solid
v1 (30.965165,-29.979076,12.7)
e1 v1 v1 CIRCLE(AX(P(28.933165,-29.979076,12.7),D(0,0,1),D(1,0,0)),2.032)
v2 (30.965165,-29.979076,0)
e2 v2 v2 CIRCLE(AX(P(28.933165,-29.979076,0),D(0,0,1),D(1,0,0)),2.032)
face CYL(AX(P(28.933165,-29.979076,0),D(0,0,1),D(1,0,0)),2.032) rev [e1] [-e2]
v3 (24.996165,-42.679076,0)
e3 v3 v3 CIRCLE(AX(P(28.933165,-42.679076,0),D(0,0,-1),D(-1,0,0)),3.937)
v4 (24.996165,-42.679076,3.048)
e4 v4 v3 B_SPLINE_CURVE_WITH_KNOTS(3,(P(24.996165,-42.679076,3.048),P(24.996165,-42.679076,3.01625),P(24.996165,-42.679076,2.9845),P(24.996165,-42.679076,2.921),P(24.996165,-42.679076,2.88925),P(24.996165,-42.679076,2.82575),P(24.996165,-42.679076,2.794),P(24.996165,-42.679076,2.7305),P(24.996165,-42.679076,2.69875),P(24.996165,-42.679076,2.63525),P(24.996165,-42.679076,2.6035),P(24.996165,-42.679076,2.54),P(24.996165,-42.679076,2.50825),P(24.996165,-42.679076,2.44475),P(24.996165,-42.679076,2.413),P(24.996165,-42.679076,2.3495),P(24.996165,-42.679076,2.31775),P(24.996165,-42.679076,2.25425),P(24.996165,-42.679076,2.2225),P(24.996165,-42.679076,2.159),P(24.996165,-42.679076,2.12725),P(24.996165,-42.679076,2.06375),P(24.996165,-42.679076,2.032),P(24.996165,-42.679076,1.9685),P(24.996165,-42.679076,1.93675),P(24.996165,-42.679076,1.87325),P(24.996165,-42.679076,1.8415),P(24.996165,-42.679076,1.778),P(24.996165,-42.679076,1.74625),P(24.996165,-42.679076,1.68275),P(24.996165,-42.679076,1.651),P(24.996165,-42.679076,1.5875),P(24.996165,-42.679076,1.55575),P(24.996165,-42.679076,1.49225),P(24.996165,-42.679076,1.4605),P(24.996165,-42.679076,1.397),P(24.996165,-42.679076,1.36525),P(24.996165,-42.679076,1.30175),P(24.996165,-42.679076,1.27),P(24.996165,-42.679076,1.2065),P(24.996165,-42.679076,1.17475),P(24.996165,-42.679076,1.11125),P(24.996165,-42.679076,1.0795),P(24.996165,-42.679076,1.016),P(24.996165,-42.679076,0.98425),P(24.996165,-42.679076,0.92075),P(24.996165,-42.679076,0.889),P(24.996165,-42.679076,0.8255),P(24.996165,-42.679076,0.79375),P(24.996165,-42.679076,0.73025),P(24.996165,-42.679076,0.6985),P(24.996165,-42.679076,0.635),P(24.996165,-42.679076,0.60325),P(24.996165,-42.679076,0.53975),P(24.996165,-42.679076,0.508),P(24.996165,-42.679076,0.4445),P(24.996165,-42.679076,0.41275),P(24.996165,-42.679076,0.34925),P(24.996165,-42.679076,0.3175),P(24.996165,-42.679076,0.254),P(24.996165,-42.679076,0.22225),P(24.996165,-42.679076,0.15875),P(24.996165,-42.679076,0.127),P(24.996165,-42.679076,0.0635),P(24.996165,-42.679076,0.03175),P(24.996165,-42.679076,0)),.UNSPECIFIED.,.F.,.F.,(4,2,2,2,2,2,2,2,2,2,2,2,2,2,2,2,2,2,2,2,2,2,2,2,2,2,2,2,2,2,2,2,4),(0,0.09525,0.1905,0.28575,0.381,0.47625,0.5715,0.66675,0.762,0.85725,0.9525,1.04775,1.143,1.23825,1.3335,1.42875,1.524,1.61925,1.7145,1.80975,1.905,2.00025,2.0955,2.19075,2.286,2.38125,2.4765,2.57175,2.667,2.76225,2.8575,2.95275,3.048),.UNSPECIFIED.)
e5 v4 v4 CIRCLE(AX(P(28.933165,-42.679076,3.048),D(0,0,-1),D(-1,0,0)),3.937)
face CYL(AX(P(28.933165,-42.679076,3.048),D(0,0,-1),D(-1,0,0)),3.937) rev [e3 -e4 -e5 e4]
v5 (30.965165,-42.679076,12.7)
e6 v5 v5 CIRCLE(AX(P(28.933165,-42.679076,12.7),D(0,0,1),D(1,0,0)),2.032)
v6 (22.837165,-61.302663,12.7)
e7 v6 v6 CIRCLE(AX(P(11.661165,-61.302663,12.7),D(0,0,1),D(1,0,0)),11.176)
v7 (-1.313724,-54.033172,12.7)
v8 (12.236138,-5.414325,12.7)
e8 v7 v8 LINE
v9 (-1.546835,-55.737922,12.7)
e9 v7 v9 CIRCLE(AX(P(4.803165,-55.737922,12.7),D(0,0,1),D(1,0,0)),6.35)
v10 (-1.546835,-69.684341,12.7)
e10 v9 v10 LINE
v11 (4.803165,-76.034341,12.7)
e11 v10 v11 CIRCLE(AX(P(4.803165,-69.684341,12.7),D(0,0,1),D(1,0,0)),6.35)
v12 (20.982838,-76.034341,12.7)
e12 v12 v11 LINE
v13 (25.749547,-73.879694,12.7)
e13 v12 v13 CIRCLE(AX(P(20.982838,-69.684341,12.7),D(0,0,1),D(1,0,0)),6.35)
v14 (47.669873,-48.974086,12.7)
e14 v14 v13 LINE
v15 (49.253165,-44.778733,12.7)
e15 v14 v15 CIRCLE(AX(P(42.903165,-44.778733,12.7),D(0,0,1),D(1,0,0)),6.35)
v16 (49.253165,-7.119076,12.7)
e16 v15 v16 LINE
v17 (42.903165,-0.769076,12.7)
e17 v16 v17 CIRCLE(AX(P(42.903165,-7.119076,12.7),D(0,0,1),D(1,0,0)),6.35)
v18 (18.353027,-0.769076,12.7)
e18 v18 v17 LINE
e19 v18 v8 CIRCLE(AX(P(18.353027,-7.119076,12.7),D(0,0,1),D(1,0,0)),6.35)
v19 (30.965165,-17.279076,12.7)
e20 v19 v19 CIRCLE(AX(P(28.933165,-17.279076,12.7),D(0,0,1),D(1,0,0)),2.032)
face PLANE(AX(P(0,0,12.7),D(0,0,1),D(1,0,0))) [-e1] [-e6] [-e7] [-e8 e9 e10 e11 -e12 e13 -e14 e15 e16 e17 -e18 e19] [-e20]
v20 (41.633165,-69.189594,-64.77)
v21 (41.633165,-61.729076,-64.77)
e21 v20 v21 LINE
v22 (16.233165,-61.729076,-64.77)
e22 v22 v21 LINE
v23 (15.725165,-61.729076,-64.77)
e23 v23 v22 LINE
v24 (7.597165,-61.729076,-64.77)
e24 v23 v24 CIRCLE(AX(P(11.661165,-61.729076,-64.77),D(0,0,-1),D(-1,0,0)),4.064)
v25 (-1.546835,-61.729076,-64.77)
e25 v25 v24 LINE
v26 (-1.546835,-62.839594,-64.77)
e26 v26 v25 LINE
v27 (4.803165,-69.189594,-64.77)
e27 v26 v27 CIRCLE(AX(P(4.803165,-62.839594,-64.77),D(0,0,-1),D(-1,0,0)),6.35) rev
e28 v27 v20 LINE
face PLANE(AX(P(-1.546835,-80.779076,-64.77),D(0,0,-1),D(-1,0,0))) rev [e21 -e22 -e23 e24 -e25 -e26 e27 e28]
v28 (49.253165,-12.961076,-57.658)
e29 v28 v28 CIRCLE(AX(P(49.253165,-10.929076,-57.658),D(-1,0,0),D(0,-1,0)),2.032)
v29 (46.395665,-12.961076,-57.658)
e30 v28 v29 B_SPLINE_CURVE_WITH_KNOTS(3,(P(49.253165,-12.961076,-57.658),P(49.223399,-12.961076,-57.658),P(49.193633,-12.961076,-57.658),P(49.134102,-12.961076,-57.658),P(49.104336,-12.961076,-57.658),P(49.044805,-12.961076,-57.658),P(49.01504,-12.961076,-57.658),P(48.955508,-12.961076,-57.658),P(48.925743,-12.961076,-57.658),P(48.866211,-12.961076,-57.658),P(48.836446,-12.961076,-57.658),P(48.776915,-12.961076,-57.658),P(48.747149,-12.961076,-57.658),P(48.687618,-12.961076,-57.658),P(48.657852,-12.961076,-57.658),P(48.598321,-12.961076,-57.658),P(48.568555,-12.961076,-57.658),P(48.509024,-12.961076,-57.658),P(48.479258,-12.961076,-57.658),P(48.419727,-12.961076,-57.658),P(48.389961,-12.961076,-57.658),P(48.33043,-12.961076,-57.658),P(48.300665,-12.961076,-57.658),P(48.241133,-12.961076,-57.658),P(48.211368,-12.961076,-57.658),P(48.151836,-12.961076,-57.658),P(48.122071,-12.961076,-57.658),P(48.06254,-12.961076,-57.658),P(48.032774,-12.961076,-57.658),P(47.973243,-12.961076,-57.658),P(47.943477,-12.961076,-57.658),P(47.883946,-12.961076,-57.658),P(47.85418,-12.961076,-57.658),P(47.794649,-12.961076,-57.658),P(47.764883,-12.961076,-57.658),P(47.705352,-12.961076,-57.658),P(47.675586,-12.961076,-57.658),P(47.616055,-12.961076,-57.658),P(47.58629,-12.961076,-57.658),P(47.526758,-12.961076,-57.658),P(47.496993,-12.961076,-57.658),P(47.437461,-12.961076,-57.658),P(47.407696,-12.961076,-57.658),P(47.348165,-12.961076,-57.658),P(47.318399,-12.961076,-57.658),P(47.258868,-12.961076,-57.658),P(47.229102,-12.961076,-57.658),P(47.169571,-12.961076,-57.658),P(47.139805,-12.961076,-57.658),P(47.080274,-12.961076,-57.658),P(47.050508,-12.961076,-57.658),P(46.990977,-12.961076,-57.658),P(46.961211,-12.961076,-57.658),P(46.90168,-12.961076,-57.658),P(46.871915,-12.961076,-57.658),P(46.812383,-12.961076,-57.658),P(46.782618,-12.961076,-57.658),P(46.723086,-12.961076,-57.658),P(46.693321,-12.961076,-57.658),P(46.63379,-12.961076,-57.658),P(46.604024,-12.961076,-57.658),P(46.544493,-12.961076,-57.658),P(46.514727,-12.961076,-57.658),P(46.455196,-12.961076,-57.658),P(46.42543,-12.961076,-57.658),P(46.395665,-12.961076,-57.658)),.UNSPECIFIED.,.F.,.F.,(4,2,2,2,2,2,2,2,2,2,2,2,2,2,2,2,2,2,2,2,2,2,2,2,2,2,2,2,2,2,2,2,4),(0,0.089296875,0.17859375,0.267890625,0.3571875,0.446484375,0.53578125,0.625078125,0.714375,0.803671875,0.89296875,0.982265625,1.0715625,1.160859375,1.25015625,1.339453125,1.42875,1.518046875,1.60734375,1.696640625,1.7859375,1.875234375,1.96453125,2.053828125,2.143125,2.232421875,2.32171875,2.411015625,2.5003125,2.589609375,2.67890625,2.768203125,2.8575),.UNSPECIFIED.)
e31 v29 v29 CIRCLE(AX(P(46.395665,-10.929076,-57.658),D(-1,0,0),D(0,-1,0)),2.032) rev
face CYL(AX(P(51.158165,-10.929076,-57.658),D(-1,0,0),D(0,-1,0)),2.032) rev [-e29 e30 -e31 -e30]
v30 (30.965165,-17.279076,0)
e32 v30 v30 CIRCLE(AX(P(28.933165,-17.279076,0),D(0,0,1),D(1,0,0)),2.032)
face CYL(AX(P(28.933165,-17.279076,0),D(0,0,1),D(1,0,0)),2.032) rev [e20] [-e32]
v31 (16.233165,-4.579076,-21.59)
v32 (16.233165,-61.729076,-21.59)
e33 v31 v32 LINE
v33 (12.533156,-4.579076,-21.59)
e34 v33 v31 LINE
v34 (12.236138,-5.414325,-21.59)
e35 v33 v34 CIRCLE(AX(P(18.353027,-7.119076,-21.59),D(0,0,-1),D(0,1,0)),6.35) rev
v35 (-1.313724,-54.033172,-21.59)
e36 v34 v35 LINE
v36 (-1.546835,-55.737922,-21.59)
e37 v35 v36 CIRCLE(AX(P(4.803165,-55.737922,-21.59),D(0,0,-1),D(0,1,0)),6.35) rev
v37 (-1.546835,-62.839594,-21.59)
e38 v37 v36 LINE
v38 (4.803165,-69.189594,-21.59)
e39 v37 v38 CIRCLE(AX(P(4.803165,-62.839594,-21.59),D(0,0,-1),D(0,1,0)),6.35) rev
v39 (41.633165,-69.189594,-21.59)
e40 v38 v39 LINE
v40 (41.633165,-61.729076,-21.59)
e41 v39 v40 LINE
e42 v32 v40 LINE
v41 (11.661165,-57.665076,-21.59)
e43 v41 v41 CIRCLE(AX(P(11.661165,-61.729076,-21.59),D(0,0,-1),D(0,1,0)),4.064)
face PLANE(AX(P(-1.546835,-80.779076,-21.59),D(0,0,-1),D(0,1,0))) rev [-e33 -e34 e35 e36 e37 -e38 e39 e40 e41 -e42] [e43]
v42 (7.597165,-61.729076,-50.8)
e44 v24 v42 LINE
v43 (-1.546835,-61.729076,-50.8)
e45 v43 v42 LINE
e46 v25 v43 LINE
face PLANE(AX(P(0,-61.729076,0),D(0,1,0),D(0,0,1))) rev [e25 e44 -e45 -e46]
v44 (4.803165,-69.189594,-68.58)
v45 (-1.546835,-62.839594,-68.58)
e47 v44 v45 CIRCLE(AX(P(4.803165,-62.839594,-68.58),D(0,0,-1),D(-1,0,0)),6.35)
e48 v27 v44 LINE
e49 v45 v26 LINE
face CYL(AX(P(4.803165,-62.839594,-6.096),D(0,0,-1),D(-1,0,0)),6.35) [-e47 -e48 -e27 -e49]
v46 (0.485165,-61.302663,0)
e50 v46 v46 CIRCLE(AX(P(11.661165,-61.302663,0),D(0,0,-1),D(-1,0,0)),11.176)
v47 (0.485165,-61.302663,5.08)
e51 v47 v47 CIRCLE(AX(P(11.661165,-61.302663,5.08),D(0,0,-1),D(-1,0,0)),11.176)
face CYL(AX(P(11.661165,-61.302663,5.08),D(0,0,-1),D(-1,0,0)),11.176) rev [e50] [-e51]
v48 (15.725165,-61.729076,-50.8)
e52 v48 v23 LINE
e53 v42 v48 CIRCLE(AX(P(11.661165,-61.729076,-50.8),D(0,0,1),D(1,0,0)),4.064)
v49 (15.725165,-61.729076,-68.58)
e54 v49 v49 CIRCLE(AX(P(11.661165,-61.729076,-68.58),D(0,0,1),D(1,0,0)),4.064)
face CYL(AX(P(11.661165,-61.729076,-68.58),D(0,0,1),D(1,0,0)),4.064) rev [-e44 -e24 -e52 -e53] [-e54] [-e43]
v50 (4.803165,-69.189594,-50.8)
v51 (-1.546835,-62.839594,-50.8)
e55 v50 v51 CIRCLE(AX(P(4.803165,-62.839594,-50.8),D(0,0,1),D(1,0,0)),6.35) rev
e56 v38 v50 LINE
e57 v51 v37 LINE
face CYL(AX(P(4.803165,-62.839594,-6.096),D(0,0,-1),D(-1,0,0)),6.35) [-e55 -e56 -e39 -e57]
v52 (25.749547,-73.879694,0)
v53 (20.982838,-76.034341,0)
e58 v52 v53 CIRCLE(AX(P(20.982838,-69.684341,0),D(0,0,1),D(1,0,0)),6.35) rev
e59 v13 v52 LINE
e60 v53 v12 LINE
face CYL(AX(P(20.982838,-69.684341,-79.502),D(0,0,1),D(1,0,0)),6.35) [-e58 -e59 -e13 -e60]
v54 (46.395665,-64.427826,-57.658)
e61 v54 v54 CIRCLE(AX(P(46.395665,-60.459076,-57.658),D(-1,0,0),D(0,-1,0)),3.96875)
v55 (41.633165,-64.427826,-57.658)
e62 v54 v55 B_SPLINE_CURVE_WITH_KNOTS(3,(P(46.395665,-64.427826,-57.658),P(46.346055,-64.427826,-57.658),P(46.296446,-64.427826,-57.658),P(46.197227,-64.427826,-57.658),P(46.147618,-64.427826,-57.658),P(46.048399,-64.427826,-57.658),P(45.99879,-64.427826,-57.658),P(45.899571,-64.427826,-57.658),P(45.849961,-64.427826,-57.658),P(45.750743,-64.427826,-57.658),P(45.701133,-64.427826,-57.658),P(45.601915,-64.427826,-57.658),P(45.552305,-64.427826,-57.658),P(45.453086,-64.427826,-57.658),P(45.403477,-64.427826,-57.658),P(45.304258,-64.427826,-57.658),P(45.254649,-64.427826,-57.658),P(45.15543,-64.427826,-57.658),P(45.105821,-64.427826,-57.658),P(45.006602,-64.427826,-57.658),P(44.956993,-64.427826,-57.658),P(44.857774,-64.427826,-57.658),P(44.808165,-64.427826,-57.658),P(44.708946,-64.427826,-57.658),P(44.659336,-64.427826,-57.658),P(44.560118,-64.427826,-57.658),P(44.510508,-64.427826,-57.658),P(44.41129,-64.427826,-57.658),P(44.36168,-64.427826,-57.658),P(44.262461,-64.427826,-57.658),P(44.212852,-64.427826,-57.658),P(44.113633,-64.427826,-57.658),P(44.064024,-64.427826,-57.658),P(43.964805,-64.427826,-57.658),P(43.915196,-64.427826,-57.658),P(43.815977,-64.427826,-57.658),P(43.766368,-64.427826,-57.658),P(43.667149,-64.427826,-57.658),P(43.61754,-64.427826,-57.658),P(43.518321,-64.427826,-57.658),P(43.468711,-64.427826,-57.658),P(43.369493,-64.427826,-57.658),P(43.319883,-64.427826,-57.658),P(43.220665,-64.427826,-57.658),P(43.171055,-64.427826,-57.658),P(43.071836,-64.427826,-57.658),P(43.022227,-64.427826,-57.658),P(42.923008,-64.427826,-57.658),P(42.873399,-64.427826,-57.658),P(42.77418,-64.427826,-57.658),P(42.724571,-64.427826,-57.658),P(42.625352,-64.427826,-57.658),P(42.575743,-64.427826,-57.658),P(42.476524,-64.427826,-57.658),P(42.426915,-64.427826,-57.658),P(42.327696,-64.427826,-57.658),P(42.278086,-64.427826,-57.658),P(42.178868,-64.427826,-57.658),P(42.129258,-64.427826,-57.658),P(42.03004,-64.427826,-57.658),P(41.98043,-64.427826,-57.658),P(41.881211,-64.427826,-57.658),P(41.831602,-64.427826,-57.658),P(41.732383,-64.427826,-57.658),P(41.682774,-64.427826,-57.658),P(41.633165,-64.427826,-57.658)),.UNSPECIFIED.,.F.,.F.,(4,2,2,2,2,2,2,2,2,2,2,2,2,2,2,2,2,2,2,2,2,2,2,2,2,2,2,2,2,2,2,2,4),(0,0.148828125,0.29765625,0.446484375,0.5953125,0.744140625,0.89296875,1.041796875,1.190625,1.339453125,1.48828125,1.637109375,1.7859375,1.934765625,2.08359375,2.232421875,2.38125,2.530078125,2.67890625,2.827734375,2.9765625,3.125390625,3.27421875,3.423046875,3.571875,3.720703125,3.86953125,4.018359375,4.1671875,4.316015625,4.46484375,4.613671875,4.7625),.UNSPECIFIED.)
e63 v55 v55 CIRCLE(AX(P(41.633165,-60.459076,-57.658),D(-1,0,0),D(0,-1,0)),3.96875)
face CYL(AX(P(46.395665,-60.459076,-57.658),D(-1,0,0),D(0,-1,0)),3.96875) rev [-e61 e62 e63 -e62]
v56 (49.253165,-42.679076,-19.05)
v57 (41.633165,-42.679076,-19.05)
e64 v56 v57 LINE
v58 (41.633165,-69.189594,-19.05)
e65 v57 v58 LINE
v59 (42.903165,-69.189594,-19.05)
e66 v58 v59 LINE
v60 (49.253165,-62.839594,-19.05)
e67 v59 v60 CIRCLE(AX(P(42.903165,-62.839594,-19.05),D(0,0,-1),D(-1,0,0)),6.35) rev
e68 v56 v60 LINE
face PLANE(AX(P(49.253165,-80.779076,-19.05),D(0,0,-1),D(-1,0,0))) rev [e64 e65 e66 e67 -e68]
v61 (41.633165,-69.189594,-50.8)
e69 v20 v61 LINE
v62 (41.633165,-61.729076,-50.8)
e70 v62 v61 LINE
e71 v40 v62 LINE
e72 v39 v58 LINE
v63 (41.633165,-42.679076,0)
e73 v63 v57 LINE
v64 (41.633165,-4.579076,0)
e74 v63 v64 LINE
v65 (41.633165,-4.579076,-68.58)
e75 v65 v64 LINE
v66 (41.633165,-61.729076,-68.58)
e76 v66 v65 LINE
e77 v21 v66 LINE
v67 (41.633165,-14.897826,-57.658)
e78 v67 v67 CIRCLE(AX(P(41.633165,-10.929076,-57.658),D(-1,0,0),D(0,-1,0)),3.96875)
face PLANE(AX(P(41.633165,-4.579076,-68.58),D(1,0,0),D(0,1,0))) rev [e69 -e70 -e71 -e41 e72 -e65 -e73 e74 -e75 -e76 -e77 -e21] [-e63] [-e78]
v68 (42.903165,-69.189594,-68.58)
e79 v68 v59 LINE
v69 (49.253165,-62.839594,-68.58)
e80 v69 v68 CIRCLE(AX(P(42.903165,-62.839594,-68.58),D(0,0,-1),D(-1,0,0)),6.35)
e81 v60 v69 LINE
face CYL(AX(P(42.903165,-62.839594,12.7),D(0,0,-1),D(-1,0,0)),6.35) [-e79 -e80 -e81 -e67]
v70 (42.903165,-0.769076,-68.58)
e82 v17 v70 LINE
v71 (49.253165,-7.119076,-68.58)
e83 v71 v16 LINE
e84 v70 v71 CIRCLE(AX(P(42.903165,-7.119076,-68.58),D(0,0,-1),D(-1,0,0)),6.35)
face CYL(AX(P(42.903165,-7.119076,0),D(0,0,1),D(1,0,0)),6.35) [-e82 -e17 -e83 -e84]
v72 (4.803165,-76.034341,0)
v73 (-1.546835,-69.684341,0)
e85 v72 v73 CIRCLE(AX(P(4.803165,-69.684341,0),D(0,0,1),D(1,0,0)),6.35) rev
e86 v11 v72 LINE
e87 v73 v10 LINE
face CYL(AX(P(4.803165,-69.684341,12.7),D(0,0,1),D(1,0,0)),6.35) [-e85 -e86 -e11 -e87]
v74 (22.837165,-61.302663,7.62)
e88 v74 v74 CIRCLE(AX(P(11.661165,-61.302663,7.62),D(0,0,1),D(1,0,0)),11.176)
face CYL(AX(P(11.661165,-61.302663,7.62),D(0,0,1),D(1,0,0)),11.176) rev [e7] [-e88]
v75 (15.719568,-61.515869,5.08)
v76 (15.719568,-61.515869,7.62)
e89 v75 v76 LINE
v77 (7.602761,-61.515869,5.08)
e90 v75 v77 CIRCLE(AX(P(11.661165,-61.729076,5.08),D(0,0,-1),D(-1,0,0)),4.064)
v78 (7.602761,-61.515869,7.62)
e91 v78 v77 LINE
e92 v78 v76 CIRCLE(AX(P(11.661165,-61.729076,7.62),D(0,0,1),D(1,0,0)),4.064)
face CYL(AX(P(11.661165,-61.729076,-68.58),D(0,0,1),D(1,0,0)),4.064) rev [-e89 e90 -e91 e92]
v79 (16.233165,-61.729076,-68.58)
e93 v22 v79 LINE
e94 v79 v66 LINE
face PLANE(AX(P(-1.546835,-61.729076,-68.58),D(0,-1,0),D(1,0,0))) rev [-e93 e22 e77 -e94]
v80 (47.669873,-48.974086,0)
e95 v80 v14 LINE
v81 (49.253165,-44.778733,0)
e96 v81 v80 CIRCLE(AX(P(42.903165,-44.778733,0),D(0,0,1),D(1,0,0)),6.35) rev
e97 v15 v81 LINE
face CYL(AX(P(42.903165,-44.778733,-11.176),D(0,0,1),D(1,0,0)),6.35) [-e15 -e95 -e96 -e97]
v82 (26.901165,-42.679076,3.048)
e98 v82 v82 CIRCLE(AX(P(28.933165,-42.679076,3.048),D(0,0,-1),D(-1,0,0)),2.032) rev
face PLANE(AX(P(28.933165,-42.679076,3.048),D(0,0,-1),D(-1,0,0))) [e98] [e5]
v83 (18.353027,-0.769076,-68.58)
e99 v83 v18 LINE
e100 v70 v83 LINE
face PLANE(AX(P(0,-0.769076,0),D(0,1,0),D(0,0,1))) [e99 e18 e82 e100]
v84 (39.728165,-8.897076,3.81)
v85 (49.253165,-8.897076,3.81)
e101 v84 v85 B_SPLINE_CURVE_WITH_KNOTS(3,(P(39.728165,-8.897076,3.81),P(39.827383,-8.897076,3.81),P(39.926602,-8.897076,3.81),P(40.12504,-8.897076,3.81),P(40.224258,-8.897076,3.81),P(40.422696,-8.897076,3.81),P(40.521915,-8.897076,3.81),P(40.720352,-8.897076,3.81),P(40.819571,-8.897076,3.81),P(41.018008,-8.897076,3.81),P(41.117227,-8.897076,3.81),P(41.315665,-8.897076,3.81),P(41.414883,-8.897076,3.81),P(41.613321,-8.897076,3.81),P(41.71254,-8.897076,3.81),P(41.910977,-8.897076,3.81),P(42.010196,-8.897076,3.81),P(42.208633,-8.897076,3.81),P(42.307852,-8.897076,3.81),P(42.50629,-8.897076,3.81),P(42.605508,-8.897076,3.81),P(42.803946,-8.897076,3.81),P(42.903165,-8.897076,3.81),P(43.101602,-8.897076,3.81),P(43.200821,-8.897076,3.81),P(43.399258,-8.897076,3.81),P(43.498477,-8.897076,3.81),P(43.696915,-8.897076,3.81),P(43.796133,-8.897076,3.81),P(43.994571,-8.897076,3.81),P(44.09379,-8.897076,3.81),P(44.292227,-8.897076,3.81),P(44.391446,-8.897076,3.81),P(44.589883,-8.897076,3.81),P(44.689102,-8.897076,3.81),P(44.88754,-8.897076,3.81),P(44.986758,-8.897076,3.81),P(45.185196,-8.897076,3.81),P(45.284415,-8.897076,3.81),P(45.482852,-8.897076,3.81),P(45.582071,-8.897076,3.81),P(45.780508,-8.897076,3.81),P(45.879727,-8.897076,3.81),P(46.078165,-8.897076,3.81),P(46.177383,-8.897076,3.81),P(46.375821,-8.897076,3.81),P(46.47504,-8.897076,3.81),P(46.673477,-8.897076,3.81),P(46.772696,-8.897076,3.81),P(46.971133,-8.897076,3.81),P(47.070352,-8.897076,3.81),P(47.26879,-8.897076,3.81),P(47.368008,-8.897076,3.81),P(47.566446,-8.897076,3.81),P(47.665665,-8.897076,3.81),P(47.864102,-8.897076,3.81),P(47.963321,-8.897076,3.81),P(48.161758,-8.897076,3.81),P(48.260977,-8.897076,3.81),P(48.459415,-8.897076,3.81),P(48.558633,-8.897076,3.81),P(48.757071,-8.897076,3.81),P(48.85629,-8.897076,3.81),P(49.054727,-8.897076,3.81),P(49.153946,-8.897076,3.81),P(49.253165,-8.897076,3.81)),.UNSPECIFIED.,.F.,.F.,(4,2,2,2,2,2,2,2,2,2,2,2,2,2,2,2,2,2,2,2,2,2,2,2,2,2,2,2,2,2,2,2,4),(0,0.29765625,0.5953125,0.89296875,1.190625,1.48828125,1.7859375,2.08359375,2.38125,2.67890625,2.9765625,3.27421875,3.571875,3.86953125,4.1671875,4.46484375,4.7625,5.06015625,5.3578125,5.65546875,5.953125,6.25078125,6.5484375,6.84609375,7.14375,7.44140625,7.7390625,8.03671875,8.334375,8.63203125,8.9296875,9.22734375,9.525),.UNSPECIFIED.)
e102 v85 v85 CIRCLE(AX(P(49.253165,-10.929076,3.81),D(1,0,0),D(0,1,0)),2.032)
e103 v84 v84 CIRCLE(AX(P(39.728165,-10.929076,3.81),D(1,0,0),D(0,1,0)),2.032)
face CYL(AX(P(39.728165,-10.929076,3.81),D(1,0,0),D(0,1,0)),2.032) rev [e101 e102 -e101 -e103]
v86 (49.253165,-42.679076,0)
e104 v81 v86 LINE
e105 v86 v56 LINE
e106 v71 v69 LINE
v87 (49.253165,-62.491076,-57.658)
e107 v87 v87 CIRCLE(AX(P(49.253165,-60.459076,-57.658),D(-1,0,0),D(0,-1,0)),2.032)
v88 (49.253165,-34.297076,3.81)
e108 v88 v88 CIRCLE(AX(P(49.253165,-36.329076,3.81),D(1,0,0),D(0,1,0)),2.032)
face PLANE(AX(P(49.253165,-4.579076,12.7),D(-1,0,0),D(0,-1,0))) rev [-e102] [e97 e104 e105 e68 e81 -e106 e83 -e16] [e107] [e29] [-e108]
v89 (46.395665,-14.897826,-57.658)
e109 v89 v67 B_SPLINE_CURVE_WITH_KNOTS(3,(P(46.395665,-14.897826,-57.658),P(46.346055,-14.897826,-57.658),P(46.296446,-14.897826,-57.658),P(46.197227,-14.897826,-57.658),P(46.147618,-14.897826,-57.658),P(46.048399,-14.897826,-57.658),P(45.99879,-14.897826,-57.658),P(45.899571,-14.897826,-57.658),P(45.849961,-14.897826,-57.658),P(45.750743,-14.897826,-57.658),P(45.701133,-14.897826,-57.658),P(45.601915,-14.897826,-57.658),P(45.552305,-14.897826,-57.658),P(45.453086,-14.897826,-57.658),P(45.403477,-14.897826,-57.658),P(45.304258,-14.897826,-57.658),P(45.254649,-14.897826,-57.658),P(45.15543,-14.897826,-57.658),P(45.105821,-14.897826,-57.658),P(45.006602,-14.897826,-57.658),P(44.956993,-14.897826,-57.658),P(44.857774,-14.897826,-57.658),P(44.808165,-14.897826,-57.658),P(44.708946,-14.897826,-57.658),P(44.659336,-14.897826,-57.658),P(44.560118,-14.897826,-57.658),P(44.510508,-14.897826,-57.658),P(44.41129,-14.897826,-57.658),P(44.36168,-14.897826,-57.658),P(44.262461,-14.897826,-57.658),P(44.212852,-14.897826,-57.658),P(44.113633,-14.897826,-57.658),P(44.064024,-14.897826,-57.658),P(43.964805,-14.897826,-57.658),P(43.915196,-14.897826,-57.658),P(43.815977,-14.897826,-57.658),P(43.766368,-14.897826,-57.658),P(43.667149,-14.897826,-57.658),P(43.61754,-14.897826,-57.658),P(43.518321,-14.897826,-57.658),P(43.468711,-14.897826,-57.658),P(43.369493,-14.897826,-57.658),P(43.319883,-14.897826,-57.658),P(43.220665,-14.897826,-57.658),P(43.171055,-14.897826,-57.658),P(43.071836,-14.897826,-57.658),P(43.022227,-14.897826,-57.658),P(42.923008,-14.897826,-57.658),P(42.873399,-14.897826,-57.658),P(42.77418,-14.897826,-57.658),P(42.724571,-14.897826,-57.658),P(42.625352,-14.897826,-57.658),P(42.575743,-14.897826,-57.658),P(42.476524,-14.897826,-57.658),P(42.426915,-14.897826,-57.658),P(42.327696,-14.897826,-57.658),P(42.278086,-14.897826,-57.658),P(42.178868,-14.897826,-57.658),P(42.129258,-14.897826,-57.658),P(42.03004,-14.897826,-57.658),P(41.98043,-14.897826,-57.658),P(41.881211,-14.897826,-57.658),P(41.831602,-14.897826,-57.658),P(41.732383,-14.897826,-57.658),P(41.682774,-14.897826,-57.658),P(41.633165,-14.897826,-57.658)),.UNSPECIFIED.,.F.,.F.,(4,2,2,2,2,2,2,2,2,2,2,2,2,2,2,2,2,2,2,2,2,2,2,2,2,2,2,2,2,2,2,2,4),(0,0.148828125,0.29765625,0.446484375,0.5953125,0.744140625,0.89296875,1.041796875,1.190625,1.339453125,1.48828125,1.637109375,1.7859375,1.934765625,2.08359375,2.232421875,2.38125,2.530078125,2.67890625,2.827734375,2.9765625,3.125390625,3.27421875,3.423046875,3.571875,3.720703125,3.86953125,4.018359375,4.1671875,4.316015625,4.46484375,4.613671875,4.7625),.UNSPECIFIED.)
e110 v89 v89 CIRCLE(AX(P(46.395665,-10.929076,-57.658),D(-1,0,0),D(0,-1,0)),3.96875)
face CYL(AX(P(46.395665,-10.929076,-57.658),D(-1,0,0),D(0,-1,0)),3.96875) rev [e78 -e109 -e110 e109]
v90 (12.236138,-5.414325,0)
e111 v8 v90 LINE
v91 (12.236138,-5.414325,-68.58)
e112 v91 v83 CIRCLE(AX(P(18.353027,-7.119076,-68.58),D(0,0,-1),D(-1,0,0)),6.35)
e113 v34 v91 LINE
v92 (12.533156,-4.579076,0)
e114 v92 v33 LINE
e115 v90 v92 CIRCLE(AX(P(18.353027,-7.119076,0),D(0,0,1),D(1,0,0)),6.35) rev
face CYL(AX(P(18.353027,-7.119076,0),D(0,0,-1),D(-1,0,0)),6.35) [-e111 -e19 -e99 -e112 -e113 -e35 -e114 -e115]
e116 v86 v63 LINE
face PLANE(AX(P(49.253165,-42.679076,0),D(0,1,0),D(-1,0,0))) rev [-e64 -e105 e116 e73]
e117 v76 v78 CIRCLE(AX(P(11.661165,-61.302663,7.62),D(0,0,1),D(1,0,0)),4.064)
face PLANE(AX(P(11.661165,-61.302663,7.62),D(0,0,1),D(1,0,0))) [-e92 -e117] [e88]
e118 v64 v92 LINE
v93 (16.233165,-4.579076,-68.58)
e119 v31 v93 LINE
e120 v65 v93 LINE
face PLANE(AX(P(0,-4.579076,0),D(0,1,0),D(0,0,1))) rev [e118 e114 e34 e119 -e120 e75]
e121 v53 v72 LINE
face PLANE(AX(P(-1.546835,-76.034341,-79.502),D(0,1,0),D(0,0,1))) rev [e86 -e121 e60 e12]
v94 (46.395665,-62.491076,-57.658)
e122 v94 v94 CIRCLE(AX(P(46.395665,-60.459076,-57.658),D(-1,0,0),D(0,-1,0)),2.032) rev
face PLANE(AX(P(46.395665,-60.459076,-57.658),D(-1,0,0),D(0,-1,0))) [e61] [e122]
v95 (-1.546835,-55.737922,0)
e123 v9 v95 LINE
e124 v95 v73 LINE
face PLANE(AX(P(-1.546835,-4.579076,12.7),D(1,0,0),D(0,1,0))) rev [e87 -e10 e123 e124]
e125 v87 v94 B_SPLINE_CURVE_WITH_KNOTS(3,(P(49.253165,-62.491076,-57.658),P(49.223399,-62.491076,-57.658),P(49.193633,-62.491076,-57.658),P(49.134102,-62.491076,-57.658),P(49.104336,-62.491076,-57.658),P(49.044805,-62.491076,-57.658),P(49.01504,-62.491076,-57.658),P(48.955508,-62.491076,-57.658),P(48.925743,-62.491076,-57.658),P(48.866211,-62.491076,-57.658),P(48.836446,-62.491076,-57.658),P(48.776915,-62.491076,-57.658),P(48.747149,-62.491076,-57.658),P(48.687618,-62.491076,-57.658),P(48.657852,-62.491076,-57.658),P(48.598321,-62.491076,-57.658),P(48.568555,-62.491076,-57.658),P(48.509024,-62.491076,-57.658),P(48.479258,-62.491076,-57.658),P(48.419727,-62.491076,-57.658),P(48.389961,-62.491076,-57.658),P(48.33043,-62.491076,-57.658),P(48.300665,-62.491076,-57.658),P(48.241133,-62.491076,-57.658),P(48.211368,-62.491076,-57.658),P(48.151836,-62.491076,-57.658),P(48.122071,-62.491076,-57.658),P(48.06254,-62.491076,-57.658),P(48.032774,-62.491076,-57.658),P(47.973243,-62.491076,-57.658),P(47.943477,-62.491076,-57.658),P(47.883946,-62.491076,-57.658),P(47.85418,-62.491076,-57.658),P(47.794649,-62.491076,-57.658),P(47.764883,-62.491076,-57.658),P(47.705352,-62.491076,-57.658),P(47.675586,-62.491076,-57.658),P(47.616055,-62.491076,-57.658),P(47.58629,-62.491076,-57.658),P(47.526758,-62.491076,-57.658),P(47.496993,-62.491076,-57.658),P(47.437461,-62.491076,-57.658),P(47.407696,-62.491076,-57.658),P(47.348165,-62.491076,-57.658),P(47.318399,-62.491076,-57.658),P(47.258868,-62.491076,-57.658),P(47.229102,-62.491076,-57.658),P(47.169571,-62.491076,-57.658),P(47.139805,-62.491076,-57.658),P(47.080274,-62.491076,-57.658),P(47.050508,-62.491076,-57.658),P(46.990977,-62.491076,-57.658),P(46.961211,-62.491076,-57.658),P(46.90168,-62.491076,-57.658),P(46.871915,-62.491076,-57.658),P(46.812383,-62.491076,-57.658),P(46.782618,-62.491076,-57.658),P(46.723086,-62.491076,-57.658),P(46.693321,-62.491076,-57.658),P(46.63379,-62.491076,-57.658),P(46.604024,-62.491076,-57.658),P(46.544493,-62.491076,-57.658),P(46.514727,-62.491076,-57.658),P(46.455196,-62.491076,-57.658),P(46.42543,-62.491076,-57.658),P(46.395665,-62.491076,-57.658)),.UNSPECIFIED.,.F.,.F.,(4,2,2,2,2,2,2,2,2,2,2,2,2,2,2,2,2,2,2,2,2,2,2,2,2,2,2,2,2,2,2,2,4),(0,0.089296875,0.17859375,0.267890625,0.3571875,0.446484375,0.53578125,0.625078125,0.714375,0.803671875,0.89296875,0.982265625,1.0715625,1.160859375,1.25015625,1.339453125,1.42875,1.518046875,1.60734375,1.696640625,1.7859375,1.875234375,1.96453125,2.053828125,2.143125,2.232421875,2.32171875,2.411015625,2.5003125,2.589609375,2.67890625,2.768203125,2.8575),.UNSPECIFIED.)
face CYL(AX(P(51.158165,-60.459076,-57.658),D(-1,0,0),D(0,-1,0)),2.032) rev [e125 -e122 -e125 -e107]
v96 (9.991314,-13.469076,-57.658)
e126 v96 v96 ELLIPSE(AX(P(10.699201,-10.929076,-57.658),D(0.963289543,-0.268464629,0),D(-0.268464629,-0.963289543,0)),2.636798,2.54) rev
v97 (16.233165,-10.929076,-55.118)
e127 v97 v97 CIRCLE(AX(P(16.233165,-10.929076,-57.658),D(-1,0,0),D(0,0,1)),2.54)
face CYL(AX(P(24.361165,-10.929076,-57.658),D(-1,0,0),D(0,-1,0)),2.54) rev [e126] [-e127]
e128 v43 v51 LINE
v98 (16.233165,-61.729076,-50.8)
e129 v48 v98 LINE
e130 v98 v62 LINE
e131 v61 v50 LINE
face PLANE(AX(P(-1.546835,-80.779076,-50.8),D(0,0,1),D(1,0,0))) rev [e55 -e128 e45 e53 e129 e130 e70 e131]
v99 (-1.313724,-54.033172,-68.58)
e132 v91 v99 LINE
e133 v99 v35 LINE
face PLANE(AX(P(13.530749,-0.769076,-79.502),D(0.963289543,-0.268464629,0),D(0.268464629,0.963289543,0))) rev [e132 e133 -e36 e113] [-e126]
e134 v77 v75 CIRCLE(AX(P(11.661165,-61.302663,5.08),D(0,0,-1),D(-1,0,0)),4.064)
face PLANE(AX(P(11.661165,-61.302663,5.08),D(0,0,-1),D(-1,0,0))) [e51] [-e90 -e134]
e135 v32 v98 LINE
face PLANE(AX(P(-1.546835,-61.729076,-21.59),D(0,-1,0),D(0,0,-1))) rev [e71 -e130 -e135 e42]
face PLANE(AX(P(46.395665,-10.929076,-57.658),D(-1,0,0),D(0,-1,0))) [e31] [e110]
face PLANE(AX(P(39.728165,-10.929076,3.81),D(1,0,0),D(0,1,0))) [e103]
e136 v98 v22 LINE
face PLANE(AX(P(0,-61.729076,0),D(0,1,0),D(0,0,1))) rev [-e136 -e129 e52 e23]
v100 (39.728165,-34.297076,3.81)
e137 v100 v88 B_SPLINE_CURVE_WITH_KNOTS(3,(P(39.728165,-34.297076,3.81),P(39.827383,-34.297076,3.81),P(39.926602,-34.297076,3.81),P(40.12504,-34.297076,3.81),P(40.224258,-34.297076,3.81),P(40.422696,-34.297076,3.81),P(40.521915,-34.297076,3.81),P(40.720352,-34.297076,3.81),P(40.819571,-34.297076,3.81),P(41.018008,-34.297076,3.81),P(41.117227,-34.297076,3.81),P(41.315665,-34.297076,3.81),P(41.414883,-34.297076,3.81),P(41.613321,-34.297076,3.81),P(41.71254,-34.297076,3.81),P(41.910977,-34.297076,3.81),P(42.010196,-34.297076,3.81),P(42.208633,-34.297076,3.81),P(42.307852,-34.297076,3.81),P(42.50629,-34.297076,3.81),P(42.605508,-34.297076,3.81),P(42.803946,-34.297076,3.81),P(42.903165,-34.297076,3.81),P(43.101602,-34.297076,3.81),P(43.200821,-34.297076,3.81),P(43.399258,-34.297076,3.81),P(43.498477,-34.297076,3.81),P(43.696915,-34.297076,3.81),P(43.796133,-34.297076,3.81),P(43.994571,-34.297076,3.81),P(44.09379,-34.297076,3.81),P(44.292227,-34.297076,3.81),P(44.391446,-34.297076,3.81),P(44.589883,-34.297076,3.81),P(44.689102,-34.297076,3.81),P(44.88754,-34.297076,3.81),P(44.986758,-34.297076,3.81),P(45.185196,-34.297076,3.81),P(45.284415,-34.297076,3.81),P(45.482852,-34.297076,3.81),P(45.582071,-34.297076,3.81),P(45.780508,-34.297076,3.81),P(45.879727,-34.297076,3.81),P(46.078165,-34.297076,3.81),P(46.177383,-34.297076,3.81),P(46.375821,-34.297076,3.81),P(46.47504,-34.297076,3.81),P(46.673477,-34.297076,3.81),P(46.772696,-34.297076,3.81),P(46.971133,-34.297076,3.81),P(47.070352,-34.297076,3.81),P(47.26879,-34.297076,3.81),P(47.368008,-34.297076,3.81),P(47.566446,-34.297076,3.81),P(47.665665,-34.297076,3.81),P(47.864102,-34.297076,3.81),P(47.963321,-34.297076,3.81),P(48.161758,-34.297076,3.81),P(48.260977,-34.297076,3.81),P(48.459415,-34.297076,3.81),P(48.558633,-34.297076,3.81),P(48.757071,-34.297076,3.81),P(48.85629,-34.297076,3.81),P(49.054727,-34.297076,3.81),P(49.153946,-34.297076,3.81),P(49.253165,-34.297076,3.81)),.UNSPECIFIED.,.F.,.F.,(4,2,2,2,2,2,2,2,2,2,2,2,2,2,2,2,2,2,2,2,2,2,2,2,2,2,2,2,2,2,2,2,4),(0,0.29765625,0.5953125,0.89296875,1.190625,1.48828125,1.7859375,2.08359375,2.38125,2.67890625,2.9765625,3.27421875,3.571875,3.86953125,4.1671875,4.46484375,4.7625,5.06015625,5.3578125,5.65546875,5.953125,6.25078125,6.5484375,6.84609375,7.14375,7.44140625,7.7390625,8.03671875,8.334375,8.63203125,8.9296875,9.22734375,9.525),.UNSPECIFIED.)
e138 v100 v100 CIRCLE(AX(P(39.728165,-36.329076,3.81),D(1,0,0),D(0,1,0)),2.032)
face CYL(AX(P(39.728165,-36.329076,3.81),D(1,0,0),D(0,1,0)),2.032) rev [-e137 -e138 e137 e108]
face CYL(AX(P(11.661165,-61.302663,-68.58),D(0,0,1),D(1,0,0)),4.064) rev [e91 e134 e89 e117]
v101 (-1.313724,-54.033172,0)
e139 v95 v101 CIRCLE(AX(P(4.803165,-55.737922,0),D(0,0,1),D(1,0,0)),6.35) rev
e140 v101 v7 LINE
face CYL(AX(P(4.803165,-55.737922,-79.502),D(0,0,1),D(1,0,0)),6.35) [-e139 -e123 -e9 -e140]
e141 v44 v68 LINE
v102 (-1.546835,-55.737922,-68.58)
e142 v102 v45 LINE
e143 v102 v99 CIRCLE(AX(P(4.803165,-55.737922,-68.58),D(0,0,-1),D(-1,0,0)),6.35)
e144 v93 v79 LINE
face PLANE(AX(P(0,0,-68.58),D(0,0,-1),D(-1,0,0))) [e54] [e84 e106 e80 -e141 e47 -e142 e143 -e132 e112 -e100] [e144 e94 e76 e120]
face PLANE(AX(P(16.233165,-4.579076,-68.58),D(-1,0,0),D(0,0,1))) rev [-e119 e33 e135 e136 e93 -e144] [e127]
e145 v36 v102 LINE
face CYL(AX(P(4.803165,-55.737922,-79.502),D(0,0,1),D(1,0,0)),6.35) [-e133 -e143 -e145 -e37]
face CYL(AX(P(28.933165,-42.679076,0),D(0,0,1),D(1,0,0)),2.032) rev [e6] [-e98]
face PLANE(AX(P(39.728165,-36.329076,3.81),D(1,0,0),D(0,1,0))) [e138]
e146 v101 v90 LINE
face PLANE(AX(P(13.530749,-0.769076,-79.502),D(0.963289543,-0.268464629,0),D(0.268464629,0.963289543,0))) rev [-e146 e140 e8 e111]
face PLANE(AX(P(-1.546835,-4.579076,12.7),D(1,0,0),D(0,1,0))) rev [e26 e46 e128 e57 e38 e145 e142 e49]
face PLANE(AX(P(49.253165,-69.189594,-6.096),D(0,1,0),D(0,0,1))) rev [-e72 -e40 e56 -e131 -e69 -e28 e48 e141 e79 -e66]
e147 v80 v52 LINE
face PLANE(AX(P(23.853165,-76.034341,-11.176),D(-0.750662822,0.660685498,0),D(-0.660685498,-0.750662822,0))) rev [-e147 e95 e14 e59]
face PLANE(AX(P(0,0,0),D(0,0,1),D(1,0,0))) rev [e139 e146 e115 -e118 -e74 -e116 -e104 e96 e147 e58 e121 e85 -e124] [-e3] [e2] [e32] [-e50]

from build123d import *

# Parameters (mm, degrees)
SKETCH1_W            = 50.8
SKETCH1_H            = 76.2
BOSS_EXTRUDE1_DEPTH  = 12.7
SKETCH3_R            = 2.032
CUT_EXTRUDE1_DEPTH   = 12.7
SKETCH17_W           = 7.62
SKETCH17_H           = 76.2
BOSS_EXTRUDE13_DEPTH = 68.58
SKETCH18_W           = 3.81
SKETCH18_H           = 19.05
BOSS_EXTRUDE14_DEPTH = 43.18
SKETCH19_W           = 29.21
SKETCH19_H           = 19.05
BOSS_EXTRUDE15_DEPTH = 43.18
SKETCH4_R            = 4.064
CUT_EXTRUDE5_DEPTH   = 125.729995039
CUT_EXTRUDE6_START   = -5.08
SKETCH21_R           = 11.176
SKETCH21_R_2         = 4.064
CUT_EXTRUDE6_DEPTH   = 5.08
SKETCH22_R           = 11.176
SKETCH22_R_2         = 4.064
CUT_EXTRUDE7_DEPTH   = 5.08
SKETCH23_W           = 19.05
SKETCH23_H           = 38.1
CUT_EXTRUDE8_DEPTH   = 115.424594585
SKETCH26_W           = 17.78
SKETCH26_H           = 46.99
BOSS_EXTRUDE16_DEPTH = 57.15
SKETCH28_W           = 50.8
SKETCH28_H           = 81.28
BOSS_EXTRUDE18_DEPTH = 3.81
SKETCH35_R           = 4.064
CUT_EXTRUDE10_DEPTH  = 125.729995039
SKETCH32_R           = 2.032
CUT_EXTRUDE12_DEPTH  = 9.525
SKETCH41_R           = 2.032
CUT_EXTRUDE14_DEPTH  = 9.525
SKETCH43_R           = 3.96875
CUT_EXTRUDE15_DEPTH  = 4.7625
SKETCH46_R           = 3.937
CUT_EXTRUDE17_DEPTH  = 3.048
SKETCH48_R           = 2.54
CUT_EXTRUDE18_DEPTH  = 25.908
SKETCH49_W           = 50.8
SKETCH49_H           = 4.744734857
CUT_EXTRUDE19_DEPTH  = 92.202
CUT_EXTRUDE20_DEPTH  = 92.202
SKETCH52_W           = 50.8
SKETCH52_H           = 6.844747076
CUT_EXTRUDE21_DEPTH  = 62.484
CUT_EXTRUDE22_DEPTH  = 23.876
FILLET1_R            = 6.35
FILLET2_R            = 6.35
FILLET3_R            = 6.35
FILLET4_R            = 6.35
FILLET5_R            = 6.35
FILLET6_R            = 6.35
FILLET7_R            = 6.35
FILLET8_R            = 6.35


with BuildPart() as part:
    # Sketch1 → Boss-Extrude1 (new body)
    with BuildSketch(Plane.XY):
        with Locations((23.853164533, -42.679075546)):
            Rectangle(SKETCH1_W, SKETCH1_H)
    extrude(amount=BOSS_EXTRUDE1_DEPTH)

    # Sketch3 → Cut-Extrude1 (cut)
    with BuildSketch(Plane.XY.offset(12.7)):
        with Locations((28.933164533, -42.679075546)):
            Circle(SKETCH3_R)
        with Locations((28.933164533, -29.979075546)):
            Circle(SKETCH3_R)
        with Locations((28.933164533, -17.279075546)):
            Circle(SKETCH3_R)
    extrude(amount=-CUT_EXTRUDE1_DEPTH, mode=Mode.SUBTRACT)

    # Sketch17 → Boss-Extrude13 (add)
    with BuildSketch(Plane(origin=(0, 0, 0), x_dir=(-1, 0, 0), z_dir=(0, 0, -1))):
        with Locations((-45.443164533, -42.679075546)):
            Rectangle(SKETCH17_W, SKETCH17_H)
    extrude(amount=BOSS_EXTRUDE13_DEPTH)

    # Sketch18 → Boss-Extrude14 (add)
    with BuildSketch(Plane.ZY.offset(-41.633164533)):
        with Locations((-66.675, -71.254075546)):
            Rectangle(SKETCH18_W, SKETCH18_H)
    extrude(amount=BOSS_EXTRUDE14_DEPTH)

    # Sketch19 → Boss-Extrude15 (add)
    with BuildSketch(Plane.ZY.offset(-41.633164533)):
        with Locations((-36.195, -71.254075546)):
            Rectangle(SKETCH19_W, SKETCH19_H)
    extrude(amount=BOSS_EXTRUDE15_DEPTH)

    # Sketch4 → Cut-Extrude5 (cut, through all)
    with BuildSketch(Plane.XY.offset(12.7)):
        with Locations((11.661164533, -61.30266317)):
            Circle(SKETCH4_R)
    extrude(amount=-CUT_EXTRUDE5_DEPTH, mode=Mode.SUBTRACT)

    # Sketch21 → Cut-Extrude6 (cut)
    with BuildSketch(Plane(origin=(0, 0, 0), x_dir=(-1, 0, 0), z_dir=(0, 0, -1)).offset(CUT_EXTRUDE6_START)):
        with Locations((-11.661164533, -61.30266317)):
            Circle(SKETCH21_R)
        with Locations(Location((-11.661164533, -61.30266317, 0), (0, 0, 180))):
            Circle(SKETCH21_R_2, mode=Mode.SUBTRACT)
    extrude(amount=CUT_EXTRUDE6_DEPTH, mode=Mode.SUBTRACT)

    # Sketch22 → Cut-Extrude7 (cut)
    with BuildSketch(Plane.XY.offset(12.7)):
        with Locations(Location((11.661164533, -61.30266317, 0), (0, 0, 180))):
            Circle(SKETCH22_R)
        with Locations((11.661164533, -61.30266317)):
            Circle(SKETCH22_R_2, mode=Mode.SUBTRACT)
    extrude(amount=-CUT_EXTRUDE7_DEPTH, mode=Mode.SUBTRACT)

    # Sketch23 → Cut-Extrude8 (cut, through all)
    with BuildSketch(Plane.ZY.offset(-41.633164533)):
        with Locations((-9.525, -61.729075546)):
            Rectangle(SKETCH23_W, SKETCH23_H)
    extrude(amount=-CUT_EXTRUDE8_DEPTH, mode=Mode.SUBTRACT)

    # Sketch26 → Boss-Extrude16 (add)
    with BuildSketch(Plane(origin=(0, -61.729075546, 0), x_dir=(1, 0, 0), z_dir=(0, 1, 0))):
        with Locations((7.343164533, 45.085)):
            Rectangle(SKETCH26_W, SKETCH26_H)
    extrude(amount=BOSS_EXTRUDE16_DEPTH)

    # Sketch28 → Boss-Extrude18 (add)
    with BuildSketch(Plane(origin=(0, -4.579075546, 0), x_dir=(1, 0, 0), z_dir=(0, 1, 0))):
        with Locations((23.853164533, 27.94)):
            Rectangle(SKETCH28_W, SKETCH28_H)
    extrude(amount=BOSS_EXTRUDE18_DEPTH)

    # Sketch35 → Cut-Extrude10 (cut, through all)
    with BuildSketch(Plane.XY.offset(12.7)):
        with Locations((11.661164533, -61.729075546)):
            Circle(SKETCH35_R)
    extrude(amount=-CUT_EXTRUDE10_DEPTH, mode=Mode.SUBTRACT)

    # Sketch32 → Cut-Extrude12 (cut)
    with BuildSketch(Plane(origin=(49.253164533, 0, 0), x_dir=(0, 0, -1), z_dir=(1, 0, 0))):
        with Locations(Location((-3.81, -36.329075546, 0), (0, 0, 90))):
            Circle(SKETCH32_R)
        with Locations(Location((-3.81, -10.929075546, 0), (0, 0, 90))):
            Circle(SKETCH32_R)
    extrude(amount=-CUT_EXTRUDE12_DEPTH, mode=Mode.SUBTRACT)

    # Sketch41 → Cut-Extrude14 (cut)
    with BuildSketch(Plane.ZY.offset(-41.633164533)):
        with Locations(Location((-57.658, -10.929075546, 0), (0, 0, 270))):
            Circle(SKETCH41_R)
        with Locations(Location((-57.658, -60.459075546, 0), (0, 0, 270))):
            Circle(SKETCH41_R)
    extrude(amount=-CUT_EXTRUDE14_DEPTH, mode=Mode.SUBTRACT)

    # Sketch43 → Cut-Extrude15 (cut)
    with BuildSketch(Plane.ZY.offset(-41.633164533)):
        with Locations(Location((-57.658, -10.929075546, 0), (0, 0, 270))):
            Circle(SKETCH43_R)
        with Locations(Location((-57.658, -60.459075546, 0), (0, 0, 270))):
            Circle(SKETCH43_R)
    extrude(amount=-CUT_EXTRUDE15_DEPTH, mode=Mode.SUBTRACT)

    # Sketch46 → Cut-Extrude17 (cut)
    with BuildSketch(Plane(origin=(0, 0, 0), x_dir=(-1, 0, 0), z_dir=(0, 0, -1))):
        with Locations((-28.933164533, -42.679075546)):
            Circle(SKETCH46_R)
    extrude(amount=-CUT_EXTRUDE17_DEPTH, mode=Mode.SUBTRACT)

    # Sketch48 → Cut-Extrude18 (cut)
    with BuildSketch(Plane.ZY.offset(1.546835467)):
        with Locations(Location((-57.658, -10.929075546, 0), (0, 0, 270))):
            Circle(SKETCH48_R)
    extrude(amount=-CUT_EXTRUDE18_DEPTH, mode=Mode.SUBTRACT)

    # Sketch49 → Cut-Extrude19 (cut)
    with BuildSketch(Plane.XY.offset(12.7)):
        with Locations((23.853164533, -78.406708118)):
            Rectangle(SKETCH49_W, SKETCH49_H)
    extrude(amount=-CUT_EXTRUDE19_DEPTH, mode=Mode.SUBTRACT)

    # Sketch51 → Cut-Extrude20 (cut)
    with BuildSketch(Plane.XY.offset(12.7)):
        Polygon((13.530749107, -0.769075546), (-1.546835467, -54.869608678), (-1.546835467, -0.769075546), align=None)
    extrude(amount=-CUT_EXTRUDE20_DEPTH, mode=Mode.SUBTRACT)

    # Sketch52 → Cut-Extrude21 (cut)
    with BuildSketch(Plane(origin=(0, 0, -68.58), x_dir=(-1, 0, 0), z_dir=(0, 0, -1))):
        with Locations((-23.853164533, -72.611967151)):
            Rectangle(SKETCH52_W, SKETCH52_H)
    extrude(amount=-CUT_EXTRUDE21_DEPTH, mode=Mode.SUBTRACT)

    # Sketch53 → Cut-Extrude22 (cut)
    with BuildSketch(Plane.XY.offset(12.7)):
        Polygon((23.853164533, -76.034340689), (49.253164533, -47.175169833), (49.253164533, -76.034340689), align=None)
    extrude(amount=-CUT_EXTRUDE22_DEPTH, mode=Mode.SUBTRACT)

    # Fillet1
    fillet1_edges = [part.edges().sort_by_distance(p)[0] for p in [
        (-1.546835467, -54.869608678, -45.085),
    ]]
    fillet(fillet1_edges, radius=FILLET1_R)

    # Fillet2
    # the kernel refuses this fillet: 6.35 mm, written as the material it takes off along each edge
    with BuildSketch(Plane(origin=(13.530749107, -0.769075546, 24.755694059), x_dir=(-0.26846462888250333, -0.9632895426812126, 0), z_dir=(0, 0, -1))) as fillet2_piece_1:
        with BuildLine():
            CenterArc((FILLET2_R * 0.759413798972, -FILLET2_R), FILLET2_R, 90, 74.427076266)
            Line((-FILLET2_R * 0.203875743709, -FILLET2_R * 0.731535371117), (0, 0))
            Line((0, 0), (FILLET2_R * 0.759413798972, 0))
        make_face()
    extrude(amount=105.391388117, mode=Mode.SUBTRACT)

    # Fillet3
    fillet3_edges = [part.edges().sort_by_distance(p)[0] for p in [
        (-1.546835467, -54.869608678, 6.35),
    ]]
    fillet(fillet3_edges, radius=FILLET3_R)

    # Fillet4
    fillet4_edges = [part.edges().sort_by_distance(p)[0] for p in [
        (49.253164533, -0.769075546, -27.94),
    ]]
    fillet(fillet4_edges, radius=FILLET4_R)

    # Fillet5
    fillet5_edges = [part.edges().sort_by_distance(p)[0] for p in [
        (49.253164533, -47.175169833, 6.35),
    ]]
    fillet(fillet5_edges, radius=FILLET5_R)

    # Fillet6
    fillet6_edges = [part.edges().sort_by_distance(p)[0] for p in [
        (-1.546835467, -76.034340689, 6.35),
        (23.853164533, -76.034340689, 6.35),
    ]]
    fillet(fillet6_edges, radius=FILLET6_R)

    # Fillet7
    fillet7_edges = [part.edges().sort_by_distance(p)[0] for p in [
        (-1.546835467, -69.189593613, -66.675),
        (-1.546835467, -69.189593613, -36.195),
    ]]
    fillet(fillet7_edges, radius=FILLET7_R)

    # Fillet8
    fillet8_edges = [part.edges().sort_by_distance(p)[0] for p in [
        (49.253164533, -69.189593613, -43.815),
    ]]
    fillet(fillet8_edges, radius=FILLET8_R)


solid = part.part
